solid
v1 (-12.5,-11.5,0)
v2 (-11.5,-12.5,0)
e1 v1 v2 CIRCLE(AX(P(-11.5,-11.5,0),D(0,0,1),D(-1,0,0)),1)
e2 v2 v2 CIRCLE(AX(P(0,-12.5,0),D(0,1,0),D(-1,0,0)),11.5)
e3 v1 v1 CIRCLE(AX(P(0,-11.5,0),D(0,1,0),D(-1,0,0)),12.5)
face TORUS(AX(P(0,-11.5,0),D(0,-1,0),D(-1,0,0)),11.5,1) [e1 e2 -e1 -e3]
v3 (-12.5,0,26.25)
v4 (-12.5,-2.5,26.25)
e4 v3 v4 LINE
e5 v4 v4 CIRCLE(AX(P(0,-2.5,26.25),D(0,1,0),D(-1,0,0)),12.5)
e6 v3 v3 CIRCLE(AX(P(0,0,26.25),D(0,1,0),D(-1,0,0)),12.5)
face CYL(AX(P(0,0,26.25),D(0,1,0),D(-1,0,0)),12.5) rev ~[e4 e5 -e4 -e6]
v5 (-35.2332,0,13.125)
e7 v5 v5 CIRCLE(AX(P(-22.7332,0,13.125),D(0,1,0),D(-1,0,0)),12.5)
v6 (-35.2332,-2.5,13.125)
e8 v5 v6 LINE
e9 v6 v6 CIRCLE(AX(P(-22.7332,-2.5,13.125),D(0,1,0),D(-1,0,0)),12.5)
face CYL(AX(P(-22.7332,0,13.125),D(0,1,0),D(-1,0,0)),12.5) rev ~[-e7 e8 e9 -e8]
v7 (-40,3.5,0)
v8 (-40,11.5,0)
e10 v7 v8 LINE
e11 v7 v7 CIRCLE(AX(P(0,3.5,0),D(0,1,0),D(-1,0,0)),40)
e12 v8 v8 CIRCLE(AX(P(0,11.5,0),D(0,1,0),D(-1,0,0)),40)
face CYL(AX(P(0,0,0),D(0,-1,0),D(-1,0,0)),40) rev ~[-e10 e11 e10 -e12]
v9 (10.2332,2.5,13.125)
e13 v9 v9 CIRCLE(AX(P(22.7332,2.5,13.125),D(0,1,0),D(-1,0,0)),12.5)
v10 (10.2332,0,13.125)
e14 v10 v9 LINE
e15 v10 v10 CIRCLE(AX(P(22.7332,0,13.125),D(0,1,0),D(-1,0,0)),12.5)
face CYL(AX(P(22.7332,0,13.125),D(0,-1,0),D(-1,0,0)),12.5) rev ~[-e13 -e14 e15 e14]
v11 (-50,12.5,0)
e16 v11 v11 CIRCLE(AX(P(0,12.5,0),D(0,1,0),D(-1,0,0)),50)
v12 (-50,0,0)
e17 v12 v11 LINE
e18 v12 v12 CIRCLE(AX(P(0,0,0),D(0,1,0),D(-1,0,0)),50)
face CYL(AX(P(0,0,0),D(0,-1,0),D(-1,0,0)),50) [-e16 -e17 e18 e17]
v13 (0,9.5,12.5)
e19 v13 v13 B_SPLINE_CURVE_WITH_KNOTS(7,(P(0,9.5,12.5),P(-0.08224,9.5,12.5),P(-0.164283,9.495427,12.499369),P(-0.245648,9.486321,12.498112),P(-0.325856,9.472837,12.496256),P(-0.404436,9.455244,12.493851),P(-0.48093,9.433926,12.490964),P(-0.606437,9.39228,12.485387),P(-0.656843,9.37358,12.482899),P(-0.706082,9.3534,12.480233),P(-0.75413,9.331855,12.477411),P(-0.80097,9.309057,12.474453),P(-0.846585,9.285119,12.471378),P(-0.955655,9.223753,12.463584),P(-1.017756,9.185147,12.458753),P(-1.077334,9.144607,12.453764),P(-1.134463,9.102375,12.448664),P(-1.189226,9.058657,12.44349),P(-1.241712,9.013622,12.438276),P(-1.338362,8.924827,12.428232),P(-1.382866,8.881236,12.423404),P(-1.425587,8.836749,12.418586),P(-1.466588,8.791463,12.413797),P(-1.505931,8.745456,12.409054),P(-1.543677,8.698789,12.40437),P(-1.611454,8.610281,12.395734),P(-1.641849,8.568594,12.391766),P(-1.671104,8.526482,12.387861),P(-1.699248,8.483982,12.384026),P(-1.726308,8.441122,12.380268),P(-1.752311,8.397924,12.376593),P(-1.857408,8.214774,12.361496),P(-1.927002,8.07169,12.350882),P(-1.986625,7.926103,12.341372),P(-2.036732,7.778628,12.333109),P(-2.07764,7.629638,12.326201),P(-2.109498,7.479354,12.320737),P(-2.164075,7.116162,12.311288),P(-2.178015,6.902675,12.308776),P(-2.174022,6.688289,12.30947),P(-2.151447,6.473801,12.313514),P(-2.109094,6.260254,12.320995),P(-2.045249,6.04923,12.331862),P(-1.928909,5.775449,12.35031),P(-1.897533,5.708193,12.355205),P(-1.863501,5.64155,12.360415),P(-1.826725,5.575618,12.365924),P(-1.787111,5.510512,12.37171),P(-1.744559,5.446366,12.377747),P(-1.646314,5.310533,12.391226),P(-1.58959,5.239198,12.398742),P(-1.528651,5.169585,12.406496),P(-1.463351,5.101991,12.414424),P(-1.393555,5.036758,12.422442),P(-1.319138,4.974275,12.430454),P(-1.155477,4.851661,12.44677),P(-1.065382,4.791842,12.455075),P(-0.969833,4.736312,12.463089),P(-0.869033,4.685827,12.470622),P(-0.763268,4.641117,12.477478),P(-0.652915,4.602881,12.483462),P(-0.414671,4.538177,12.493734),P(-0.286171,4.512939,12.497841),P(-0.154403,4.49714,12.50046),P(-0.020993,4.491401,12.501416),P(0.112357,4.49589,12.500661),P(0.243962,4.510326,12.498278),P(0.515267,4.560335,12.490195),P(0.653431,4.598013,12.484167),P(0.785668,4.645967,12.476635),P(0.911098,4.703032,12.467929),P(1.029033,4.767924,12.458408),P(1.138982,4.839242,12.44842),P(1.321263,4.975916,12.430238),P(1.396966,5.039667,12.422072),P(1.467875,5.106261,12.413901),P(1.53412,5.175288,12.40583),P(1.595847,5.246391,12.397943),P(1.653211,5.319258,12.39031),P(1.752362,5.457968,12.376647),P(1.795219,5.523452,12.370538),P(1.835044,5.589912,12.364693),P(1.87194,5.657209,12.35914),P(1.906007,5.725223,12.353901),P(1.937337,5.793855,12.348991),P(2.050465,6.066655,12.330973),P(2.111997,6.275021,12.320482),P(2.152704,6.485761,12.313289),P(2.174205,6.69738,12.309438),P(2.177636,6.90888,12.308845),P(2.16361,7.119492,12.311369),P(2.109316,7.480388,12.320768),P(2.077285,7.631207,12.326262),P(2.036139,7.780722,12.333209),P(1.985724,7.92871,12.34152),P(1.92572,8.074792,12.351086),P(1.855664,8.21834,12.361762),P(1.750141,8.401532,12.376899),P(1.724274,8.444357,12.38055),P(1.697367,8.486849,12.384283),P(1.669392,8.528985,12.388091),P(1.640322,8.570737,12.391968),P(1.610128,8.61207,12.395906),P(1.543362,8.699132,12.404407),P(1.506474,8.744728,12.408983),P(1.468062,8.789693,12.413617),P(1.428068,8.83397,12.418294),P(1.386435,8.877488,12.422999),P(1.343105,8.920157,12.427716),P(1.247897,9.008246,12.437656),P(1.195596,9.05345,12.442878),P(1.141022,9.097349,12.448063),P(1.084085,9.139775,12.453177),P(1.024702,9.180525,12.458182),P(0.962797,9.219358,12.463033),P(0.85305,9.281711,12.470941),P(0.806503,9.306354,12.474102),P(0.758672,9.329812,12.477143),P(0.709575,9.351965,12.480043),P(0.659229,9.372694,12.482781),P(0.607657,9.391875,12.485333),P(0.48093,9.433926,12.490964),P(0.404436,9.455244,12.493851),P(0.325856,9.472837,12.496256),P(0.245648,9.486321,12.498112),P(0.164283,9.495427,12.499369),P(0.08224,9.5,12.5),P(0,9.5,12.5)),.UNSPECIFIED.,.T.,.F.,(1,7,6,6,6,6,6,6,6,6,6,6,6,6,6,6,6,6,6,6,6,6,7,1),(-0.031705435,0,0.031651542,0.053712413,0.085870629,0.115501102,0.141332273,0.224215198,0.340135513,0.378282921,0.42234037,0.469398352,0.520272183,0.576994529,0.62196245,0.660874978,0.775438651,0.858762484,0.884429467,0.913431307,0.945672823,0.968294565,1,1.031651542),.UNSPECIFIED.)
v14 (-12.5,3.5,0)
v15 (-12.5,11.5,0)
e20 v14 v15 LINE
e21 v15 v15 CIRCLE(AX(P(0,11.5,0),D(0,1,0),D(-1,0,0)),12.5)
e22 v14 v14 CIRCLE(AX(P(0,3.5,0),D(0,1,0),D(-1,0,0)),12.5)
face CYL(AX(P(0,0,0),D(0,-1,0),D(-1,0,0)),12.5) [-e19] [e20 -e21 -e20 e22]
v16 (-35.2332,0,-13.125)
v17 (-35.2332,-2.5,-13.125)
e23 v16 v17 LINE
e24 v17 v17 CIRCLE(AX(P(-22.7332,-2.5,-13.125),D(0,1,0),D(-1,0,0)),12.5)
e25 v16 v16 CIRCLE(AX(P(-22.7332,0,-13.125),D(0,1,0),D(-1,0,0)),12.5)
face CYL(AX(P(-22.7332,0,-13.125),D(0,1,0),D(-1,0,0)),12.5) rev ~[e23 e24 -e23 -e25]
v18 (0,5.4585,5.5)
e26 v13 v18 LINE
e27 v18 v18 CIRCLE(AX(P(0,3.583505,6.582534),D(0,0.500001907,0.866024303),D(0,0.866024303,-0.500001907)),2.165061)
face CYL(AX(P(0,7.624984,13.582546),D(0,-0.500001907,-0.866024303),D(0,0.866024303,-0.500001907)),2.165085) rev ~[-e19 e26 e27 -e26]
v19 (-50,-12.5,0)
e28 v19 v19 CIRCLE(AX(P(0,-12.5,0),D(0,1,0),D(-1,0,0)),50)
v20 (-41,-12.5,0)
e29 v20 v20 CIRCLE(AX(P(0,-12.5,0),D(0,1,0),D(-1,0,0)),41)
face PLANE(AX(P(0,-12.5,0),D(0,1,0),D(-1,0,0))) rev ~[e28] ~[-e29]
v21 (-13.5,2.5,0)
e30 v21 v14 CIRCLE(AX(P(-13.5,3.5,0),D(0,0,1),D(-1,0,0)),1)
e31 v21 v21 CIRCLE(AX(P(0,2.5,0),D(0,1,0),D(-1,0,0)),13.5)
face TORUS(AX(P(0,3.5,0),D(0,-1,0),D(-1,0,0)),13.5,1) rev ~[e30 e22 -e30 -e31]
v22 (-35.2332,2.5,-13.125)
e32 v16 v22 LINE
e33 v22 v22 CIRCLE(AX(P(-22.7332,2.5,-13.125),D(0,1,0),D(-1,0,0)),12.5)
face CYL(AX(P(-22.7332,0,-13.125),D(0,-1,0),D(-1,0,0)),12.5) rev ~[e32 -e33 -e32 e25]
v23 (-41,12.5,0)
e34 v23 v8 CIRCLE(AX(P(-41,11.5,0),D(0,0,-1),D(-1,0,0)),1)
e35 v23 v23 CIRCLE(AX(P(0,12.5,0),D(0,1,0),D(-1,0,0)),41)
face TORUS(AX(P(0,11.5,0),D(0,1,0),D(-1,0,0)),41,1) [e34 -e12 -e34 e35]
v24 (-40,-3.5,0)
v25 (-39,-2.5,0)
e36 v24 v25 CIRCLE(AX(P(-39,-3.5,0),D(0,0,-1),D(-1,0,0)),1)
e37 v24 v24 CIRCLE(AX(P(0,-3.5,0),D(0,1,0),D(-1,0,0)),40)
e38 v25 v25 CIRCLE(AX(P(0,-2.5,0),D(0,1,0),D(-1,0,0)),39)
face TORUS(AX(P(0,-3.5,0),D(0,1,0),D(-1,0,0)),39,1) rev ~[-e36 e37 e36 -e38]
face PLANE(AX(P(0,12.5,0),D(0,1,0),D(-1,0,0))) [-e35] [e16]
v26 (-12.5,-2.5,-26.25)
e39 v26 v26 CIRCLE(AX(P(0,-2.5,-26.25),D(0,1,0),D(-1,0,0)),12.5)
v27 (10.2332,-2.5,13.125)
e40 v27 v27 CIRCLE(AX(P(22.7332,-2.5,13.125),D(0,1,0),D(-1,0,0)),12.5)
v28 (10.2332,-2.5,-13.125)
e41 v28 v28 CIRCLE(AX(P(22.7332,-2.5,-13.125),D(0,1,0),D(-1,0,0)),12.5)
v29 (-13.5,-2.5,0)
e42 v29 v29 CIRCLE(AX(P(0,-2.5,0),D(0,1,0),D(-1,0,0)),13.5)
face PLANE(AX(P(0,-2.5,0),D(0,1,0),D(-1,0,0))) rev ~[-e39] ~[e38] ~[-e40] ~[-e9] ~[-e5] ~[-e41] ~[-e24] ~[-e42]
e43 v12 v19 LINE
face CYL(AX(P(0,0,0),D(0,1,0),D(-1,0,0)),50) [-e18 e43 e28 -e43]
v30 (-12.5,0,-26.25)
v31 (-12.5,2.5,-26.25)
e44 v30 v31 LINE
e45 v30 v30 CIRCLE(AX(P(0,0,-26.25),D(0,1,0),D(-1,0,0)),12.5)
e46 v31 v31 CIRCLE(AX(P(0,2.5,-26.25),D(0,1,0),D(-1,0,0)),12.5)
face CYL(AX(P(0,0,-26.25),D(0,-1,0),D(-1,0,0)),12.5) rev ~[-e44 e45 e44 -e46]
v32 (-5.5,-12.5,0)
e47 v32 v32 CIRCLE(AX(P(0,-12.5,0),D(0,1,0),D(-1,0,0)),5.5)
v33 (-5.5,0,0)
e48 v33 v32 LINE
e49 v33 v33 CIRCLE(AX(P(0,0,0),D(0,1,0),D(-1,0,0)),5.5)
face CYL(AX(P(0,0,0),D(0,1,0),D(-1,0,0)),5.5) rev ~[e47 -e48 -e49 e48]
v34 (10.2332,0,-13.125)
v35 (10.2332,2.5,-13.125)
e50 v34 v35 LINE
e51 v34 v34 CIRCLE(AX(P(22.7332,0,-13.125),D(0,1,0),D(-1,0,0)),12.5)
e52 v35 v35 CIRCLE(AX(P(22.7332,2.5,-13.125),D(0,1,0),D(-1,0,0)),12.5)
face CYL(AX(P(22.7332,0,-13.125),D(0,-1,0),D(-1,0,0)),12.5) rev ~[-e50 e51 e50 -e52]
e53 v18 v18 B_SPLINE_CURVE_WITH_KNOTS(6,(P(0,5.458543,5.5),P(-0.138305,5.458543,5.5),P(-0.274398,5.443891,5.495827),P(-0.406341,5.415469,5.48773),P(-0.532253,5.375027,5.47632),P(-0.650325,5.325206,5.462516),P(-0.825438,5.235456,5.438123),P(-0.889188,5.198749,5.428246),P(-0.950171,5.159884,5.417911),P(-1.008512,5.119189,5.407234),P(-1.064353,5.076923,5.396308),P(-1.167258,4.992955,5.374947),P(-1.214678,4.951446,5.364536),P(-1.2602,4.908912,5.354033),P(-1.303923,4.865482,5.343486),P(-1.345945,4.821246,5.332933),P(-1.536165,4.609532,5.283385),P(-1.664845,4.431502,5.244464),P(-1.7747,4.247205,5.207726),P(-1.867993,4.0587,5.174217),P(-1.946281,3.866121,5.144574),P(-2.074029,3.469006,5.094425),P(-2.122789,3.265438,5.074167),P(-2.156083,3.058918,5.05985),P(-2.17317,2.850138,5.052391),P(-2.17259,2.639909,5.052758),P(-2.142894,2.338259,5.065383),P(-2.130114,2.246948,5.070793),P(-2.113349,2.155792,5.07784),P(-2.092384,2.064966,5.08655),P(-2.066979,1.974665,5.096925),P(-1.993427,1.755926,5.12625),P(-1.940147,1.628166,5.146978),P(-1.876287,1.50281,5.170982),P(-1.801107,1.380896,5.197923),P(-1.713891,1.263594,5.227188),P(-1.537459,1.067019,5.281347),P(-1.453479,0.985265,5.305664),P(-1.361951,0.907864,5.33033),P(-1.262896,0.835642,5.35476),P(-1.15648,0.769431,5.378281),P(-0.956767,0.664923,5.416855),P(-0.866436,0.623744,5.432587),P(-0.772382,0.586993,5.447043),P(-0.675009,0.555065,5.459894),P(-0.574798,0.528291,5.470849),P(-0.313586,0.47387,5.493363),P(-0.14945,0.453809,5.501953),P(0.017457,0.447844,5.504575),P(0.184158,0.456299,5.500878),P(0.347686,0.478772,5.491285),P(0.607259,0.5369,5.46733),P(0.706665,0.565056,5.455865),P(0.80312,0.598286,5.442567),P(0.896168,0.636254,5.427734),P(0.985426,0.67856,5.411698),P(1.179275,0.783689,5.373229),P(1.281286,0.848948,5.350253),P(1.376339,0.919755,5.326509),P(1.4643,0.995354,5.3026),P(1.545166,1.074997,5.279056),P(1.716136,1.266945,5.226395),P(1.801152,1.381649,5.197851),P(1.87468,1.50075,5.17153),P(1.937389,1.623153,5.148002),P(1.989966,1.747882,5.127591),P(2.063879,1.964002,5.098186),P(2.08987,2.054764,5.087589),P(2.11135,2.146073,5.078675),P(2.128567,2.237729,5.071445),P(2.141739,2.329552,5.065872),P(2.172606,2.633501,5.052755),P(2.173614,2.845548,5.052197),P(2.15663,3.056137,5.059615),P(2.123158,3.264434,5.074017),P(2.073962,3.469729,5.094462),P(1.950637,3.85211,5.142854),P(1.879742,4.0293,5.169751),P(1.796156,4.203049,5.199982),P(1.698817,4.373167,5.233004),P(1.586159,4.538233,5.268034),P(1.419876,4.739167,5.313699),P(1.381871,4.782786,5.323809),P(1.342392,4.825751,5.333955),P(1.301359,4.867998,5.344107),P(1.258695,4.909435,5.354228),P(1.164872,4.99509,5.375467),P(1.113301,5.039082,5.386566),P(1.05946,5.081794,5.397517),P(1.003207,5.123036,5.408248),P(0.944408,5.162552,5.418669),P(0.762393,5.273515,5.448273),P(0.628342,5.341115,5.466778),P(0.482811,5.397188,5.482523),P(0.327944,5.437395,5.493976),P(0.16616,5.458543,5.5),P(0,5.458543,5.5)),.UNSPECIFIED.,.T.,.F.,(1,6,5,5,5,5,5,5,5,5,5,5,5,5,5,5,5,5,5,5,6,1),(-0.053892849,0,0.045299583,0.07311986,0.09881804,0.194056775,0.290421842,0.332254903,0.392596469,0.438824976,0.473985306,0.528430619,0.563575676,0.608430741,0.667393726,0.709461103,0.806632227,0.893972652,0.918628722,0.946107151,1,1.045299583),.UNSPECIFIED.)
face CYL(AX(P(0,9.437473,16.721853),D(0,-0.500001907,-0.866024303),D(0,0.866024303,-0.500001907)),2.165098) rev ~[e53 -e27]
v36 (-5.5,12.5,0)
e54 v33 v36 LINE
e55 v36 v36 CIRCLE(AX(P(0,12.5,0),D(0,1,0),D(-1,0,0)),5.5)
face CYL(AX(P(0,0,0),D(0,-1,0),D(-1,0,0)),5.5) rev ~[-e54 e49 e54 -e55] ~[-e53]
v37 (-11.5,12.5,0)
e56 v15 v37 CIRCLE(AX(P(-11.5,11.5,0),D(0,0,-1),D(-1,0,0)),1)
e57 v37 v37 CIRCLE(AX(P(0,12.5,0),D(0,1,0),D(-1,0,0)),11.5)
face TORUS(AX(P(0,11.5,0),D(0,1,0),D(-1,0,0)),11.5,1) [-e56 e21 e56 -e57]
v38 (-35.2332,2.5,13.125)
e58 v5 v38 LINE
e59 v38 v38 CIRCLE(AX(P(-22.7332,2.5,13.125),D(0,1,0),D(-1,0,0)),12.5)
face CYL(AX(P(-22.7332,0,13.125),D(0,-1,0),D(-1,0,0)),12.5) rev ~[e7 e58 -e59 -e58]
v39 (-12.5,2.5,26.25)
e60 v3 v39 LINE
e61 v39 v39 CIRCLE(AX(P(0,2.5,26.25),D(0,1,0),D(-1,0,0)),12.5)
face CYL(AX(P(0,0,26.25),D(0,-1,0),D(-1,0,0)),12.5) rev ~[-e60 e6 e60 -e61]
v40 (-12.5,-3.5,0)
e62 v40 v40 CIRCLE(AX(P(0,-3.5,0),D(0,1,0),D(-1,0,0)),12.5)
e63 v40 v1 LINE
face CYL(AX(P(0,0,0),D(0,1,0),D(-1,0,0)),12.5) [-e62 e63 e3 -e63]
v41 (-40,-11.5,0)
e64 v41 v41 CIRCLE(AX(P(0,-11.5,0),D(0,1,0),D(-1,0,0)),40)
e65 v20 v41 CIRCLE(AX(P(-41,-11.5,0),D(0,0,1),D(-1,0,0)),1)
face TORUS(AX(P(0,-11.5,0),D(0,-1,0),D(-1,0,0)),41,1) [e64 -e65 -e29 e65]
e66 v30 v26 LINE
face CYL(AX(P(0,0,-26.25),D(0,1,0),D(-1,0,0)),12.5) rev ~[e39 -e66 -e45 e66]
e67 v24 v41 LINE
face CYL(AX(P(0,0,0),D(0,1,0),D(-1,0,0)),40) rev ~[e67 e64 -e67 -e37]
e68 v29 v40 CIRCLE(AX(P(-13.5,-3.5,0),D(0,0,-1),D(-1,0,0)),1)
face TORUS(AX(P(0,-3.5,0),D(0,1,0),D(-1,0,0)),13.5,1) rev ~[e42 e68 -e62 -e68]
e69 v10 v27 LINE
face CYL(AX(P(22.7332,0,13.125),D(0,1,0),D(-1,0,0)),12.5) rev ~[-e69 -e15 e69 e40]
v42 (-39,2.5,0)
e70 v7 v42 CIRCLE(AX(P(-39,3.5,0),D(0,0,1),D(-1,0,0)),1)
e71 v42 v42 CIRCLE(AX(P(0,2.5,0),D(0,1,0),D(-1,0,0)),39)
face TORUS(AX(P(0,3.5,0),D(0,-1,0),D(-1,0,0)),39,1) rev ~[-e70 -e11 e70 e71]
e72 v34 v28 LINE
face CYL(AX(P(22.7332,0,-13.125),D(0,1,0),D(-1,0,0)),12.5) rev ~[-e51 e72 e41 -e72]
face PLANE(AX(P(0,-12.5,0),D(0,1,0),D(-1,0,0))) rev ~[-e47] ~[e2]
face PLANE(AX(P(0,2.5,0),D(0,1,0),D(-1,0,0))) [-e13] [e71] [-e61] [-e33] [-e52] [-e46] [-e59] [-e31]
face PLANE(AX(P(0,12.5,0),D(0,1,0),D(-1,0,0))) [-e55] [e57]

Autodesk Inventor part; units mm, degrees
ref_plane "XY Plane" through (0, 0, 0) normal (0, 0, 1) x (1, 0, 0)
sketch "Skizze1" plane through (0, 0, 0) normal (0, 1, 0) x (-1, 0, 0)
  circle A0 centre (0, 0) radius 50
  circle A1 centre (0, 0) radius 40
  circle A2 centre (0, 0) radius 12.5
  circle A3 centre (0, 0) radius 5.5
  dimension "d0" = 100
  dimension "d1" = 80
  dimension "d2" = 25
  dimension "d3" = 11
extrude "Extrusion1" add sketch "Skizze1" along normal mid plane 25
sketch "Skizze2" plane through (0, 0, 0) normal (0, 1, 0) x (-1, 0, 0)
  circle A0 centre (0, 0) radius 40 projected
  circle A1 centre (0, 0) radius 12.5 projected
extrude "Extrusion2" add sketch "Skizze2" along normal mid plane 5
sketch "Skizze3" plane through (0, 0, 0) normal (0, 1, 0) x (-1, 0, 0)
  circle A0 centre (0, 0) radius 26.25 construction
  circle A1 centre (0, 26.25) radius 12.5
  circle A2 centre (0, 0) radius 26.25 construction
  circle A3 centre (-22.7332, 13.125) radius 12.5
  circle A4 centre (0, 0) radius 26.25 construction
  circle A5 centre (-22.7332, -13.125) radius 12.5
  circle A6 centre (0, 0) radius 26.25 construction
  circle A7 centre (0, -26.25) radius 12.5
  circle A8 centre (0, 0) radius 26.25 construction
  circle A9 centre (22.7332, -13.125) radius 12.5
  circle A10 centre (0, 0) radius 26.25 construction
  circle A11 centre (22.7332, 13.125) radius 12.5
  dimension "d8" = 52.5
  dimension "d9" = 25
  dimension "d12" = 360
extrude "Extrusion3" cut sketch "Skizze3" along normal mid plane 5
sketch "Skizze4" plane through (0, 0, 0) normal (1, 0, 0) x (0, 1, 0)
  line L0 (12.5, 5.5) -> (-12.5, 5.5) projected
  line L1 (4.5, 19.5) -> (9.5, 19.5) construction
  line L2 (9.5, 19.5) -> (9.5, 5.5) construction
  line L3 (9.5, 5.5) -> (4.5, 5.5) construction
  line L4 (4.5, 5.5) -> (4.5, 19.5) construction
  line L5 (2.5, 12.5) -> (12.5, 12.5) projected
  line L6 (9.5, 12.5) -> (5.4585, 5.5)
  line L7 (9.5, 12.5) -> (17.5829, 12.5) construction
  line L8 (5.4585, 5.5) -> (-0.0415, 5.5)
  line L9 (9.5, 12.5) -> (4.5, 12.5)
  line L10 (4.5, 12.5) -> (0.4585, 5.5)
  line L11 (4.5, 12.5) -> (12.5829, 12.5) construction
  line L12 (0.4585, 5.5) -> (5.4585, 5.5)
  line L13 (2.9585, 5.5) -> (7, 12.5) construction
  line L14 (7.4793, 9) -> (5.6043, 10.0825)
  line L15 (11.3125, 15.6393) -> (3.646, 2.3607)
  line L16 (3.646, 2.3607) -> (1.771, 3.4432)
  line L17 (1.771, 3.4432) -> (9.4375, 16.7219)
  line L18 (9.4375, 16.7219) -> (11.3125, 15.6393)
  line L19 (11.3125, 15.6393) -> (1.771, 3.4432) construction
  line L20 (3.646, 2.3607) -> (9.4375, 16.7219) construction
  point P0 (0, 0)
  point P1 (6.5418, 9.5413)
  dimension "d16" = 5
  dimension "d17" = 120
  dimension "d18" = 5.5
  dimension "d19" = 120
revolve "Umdrehung1" cut sketch "Skizze4" angle 360 about axis through (0, 1.771, 3.4432) along (0, 0.5, 0.8660254) contours L15 L16 L17 L0 | L0 L17 L14 L6 | L14 L17 L5 L6 | L5 L17 L18 L15
fillet "Rundung1" radius 1 8 edges at (40, 2.5, 0) (12.5, 2.5, 0) (40, 12.5, 0) (12.5, -2.5, 0) (40, -2.5, 0) (12.5, -12.5, 0) (40, -12.5, 0) (12.5, 12.5, 0)
properties part number "sf_Flywheel_1"
